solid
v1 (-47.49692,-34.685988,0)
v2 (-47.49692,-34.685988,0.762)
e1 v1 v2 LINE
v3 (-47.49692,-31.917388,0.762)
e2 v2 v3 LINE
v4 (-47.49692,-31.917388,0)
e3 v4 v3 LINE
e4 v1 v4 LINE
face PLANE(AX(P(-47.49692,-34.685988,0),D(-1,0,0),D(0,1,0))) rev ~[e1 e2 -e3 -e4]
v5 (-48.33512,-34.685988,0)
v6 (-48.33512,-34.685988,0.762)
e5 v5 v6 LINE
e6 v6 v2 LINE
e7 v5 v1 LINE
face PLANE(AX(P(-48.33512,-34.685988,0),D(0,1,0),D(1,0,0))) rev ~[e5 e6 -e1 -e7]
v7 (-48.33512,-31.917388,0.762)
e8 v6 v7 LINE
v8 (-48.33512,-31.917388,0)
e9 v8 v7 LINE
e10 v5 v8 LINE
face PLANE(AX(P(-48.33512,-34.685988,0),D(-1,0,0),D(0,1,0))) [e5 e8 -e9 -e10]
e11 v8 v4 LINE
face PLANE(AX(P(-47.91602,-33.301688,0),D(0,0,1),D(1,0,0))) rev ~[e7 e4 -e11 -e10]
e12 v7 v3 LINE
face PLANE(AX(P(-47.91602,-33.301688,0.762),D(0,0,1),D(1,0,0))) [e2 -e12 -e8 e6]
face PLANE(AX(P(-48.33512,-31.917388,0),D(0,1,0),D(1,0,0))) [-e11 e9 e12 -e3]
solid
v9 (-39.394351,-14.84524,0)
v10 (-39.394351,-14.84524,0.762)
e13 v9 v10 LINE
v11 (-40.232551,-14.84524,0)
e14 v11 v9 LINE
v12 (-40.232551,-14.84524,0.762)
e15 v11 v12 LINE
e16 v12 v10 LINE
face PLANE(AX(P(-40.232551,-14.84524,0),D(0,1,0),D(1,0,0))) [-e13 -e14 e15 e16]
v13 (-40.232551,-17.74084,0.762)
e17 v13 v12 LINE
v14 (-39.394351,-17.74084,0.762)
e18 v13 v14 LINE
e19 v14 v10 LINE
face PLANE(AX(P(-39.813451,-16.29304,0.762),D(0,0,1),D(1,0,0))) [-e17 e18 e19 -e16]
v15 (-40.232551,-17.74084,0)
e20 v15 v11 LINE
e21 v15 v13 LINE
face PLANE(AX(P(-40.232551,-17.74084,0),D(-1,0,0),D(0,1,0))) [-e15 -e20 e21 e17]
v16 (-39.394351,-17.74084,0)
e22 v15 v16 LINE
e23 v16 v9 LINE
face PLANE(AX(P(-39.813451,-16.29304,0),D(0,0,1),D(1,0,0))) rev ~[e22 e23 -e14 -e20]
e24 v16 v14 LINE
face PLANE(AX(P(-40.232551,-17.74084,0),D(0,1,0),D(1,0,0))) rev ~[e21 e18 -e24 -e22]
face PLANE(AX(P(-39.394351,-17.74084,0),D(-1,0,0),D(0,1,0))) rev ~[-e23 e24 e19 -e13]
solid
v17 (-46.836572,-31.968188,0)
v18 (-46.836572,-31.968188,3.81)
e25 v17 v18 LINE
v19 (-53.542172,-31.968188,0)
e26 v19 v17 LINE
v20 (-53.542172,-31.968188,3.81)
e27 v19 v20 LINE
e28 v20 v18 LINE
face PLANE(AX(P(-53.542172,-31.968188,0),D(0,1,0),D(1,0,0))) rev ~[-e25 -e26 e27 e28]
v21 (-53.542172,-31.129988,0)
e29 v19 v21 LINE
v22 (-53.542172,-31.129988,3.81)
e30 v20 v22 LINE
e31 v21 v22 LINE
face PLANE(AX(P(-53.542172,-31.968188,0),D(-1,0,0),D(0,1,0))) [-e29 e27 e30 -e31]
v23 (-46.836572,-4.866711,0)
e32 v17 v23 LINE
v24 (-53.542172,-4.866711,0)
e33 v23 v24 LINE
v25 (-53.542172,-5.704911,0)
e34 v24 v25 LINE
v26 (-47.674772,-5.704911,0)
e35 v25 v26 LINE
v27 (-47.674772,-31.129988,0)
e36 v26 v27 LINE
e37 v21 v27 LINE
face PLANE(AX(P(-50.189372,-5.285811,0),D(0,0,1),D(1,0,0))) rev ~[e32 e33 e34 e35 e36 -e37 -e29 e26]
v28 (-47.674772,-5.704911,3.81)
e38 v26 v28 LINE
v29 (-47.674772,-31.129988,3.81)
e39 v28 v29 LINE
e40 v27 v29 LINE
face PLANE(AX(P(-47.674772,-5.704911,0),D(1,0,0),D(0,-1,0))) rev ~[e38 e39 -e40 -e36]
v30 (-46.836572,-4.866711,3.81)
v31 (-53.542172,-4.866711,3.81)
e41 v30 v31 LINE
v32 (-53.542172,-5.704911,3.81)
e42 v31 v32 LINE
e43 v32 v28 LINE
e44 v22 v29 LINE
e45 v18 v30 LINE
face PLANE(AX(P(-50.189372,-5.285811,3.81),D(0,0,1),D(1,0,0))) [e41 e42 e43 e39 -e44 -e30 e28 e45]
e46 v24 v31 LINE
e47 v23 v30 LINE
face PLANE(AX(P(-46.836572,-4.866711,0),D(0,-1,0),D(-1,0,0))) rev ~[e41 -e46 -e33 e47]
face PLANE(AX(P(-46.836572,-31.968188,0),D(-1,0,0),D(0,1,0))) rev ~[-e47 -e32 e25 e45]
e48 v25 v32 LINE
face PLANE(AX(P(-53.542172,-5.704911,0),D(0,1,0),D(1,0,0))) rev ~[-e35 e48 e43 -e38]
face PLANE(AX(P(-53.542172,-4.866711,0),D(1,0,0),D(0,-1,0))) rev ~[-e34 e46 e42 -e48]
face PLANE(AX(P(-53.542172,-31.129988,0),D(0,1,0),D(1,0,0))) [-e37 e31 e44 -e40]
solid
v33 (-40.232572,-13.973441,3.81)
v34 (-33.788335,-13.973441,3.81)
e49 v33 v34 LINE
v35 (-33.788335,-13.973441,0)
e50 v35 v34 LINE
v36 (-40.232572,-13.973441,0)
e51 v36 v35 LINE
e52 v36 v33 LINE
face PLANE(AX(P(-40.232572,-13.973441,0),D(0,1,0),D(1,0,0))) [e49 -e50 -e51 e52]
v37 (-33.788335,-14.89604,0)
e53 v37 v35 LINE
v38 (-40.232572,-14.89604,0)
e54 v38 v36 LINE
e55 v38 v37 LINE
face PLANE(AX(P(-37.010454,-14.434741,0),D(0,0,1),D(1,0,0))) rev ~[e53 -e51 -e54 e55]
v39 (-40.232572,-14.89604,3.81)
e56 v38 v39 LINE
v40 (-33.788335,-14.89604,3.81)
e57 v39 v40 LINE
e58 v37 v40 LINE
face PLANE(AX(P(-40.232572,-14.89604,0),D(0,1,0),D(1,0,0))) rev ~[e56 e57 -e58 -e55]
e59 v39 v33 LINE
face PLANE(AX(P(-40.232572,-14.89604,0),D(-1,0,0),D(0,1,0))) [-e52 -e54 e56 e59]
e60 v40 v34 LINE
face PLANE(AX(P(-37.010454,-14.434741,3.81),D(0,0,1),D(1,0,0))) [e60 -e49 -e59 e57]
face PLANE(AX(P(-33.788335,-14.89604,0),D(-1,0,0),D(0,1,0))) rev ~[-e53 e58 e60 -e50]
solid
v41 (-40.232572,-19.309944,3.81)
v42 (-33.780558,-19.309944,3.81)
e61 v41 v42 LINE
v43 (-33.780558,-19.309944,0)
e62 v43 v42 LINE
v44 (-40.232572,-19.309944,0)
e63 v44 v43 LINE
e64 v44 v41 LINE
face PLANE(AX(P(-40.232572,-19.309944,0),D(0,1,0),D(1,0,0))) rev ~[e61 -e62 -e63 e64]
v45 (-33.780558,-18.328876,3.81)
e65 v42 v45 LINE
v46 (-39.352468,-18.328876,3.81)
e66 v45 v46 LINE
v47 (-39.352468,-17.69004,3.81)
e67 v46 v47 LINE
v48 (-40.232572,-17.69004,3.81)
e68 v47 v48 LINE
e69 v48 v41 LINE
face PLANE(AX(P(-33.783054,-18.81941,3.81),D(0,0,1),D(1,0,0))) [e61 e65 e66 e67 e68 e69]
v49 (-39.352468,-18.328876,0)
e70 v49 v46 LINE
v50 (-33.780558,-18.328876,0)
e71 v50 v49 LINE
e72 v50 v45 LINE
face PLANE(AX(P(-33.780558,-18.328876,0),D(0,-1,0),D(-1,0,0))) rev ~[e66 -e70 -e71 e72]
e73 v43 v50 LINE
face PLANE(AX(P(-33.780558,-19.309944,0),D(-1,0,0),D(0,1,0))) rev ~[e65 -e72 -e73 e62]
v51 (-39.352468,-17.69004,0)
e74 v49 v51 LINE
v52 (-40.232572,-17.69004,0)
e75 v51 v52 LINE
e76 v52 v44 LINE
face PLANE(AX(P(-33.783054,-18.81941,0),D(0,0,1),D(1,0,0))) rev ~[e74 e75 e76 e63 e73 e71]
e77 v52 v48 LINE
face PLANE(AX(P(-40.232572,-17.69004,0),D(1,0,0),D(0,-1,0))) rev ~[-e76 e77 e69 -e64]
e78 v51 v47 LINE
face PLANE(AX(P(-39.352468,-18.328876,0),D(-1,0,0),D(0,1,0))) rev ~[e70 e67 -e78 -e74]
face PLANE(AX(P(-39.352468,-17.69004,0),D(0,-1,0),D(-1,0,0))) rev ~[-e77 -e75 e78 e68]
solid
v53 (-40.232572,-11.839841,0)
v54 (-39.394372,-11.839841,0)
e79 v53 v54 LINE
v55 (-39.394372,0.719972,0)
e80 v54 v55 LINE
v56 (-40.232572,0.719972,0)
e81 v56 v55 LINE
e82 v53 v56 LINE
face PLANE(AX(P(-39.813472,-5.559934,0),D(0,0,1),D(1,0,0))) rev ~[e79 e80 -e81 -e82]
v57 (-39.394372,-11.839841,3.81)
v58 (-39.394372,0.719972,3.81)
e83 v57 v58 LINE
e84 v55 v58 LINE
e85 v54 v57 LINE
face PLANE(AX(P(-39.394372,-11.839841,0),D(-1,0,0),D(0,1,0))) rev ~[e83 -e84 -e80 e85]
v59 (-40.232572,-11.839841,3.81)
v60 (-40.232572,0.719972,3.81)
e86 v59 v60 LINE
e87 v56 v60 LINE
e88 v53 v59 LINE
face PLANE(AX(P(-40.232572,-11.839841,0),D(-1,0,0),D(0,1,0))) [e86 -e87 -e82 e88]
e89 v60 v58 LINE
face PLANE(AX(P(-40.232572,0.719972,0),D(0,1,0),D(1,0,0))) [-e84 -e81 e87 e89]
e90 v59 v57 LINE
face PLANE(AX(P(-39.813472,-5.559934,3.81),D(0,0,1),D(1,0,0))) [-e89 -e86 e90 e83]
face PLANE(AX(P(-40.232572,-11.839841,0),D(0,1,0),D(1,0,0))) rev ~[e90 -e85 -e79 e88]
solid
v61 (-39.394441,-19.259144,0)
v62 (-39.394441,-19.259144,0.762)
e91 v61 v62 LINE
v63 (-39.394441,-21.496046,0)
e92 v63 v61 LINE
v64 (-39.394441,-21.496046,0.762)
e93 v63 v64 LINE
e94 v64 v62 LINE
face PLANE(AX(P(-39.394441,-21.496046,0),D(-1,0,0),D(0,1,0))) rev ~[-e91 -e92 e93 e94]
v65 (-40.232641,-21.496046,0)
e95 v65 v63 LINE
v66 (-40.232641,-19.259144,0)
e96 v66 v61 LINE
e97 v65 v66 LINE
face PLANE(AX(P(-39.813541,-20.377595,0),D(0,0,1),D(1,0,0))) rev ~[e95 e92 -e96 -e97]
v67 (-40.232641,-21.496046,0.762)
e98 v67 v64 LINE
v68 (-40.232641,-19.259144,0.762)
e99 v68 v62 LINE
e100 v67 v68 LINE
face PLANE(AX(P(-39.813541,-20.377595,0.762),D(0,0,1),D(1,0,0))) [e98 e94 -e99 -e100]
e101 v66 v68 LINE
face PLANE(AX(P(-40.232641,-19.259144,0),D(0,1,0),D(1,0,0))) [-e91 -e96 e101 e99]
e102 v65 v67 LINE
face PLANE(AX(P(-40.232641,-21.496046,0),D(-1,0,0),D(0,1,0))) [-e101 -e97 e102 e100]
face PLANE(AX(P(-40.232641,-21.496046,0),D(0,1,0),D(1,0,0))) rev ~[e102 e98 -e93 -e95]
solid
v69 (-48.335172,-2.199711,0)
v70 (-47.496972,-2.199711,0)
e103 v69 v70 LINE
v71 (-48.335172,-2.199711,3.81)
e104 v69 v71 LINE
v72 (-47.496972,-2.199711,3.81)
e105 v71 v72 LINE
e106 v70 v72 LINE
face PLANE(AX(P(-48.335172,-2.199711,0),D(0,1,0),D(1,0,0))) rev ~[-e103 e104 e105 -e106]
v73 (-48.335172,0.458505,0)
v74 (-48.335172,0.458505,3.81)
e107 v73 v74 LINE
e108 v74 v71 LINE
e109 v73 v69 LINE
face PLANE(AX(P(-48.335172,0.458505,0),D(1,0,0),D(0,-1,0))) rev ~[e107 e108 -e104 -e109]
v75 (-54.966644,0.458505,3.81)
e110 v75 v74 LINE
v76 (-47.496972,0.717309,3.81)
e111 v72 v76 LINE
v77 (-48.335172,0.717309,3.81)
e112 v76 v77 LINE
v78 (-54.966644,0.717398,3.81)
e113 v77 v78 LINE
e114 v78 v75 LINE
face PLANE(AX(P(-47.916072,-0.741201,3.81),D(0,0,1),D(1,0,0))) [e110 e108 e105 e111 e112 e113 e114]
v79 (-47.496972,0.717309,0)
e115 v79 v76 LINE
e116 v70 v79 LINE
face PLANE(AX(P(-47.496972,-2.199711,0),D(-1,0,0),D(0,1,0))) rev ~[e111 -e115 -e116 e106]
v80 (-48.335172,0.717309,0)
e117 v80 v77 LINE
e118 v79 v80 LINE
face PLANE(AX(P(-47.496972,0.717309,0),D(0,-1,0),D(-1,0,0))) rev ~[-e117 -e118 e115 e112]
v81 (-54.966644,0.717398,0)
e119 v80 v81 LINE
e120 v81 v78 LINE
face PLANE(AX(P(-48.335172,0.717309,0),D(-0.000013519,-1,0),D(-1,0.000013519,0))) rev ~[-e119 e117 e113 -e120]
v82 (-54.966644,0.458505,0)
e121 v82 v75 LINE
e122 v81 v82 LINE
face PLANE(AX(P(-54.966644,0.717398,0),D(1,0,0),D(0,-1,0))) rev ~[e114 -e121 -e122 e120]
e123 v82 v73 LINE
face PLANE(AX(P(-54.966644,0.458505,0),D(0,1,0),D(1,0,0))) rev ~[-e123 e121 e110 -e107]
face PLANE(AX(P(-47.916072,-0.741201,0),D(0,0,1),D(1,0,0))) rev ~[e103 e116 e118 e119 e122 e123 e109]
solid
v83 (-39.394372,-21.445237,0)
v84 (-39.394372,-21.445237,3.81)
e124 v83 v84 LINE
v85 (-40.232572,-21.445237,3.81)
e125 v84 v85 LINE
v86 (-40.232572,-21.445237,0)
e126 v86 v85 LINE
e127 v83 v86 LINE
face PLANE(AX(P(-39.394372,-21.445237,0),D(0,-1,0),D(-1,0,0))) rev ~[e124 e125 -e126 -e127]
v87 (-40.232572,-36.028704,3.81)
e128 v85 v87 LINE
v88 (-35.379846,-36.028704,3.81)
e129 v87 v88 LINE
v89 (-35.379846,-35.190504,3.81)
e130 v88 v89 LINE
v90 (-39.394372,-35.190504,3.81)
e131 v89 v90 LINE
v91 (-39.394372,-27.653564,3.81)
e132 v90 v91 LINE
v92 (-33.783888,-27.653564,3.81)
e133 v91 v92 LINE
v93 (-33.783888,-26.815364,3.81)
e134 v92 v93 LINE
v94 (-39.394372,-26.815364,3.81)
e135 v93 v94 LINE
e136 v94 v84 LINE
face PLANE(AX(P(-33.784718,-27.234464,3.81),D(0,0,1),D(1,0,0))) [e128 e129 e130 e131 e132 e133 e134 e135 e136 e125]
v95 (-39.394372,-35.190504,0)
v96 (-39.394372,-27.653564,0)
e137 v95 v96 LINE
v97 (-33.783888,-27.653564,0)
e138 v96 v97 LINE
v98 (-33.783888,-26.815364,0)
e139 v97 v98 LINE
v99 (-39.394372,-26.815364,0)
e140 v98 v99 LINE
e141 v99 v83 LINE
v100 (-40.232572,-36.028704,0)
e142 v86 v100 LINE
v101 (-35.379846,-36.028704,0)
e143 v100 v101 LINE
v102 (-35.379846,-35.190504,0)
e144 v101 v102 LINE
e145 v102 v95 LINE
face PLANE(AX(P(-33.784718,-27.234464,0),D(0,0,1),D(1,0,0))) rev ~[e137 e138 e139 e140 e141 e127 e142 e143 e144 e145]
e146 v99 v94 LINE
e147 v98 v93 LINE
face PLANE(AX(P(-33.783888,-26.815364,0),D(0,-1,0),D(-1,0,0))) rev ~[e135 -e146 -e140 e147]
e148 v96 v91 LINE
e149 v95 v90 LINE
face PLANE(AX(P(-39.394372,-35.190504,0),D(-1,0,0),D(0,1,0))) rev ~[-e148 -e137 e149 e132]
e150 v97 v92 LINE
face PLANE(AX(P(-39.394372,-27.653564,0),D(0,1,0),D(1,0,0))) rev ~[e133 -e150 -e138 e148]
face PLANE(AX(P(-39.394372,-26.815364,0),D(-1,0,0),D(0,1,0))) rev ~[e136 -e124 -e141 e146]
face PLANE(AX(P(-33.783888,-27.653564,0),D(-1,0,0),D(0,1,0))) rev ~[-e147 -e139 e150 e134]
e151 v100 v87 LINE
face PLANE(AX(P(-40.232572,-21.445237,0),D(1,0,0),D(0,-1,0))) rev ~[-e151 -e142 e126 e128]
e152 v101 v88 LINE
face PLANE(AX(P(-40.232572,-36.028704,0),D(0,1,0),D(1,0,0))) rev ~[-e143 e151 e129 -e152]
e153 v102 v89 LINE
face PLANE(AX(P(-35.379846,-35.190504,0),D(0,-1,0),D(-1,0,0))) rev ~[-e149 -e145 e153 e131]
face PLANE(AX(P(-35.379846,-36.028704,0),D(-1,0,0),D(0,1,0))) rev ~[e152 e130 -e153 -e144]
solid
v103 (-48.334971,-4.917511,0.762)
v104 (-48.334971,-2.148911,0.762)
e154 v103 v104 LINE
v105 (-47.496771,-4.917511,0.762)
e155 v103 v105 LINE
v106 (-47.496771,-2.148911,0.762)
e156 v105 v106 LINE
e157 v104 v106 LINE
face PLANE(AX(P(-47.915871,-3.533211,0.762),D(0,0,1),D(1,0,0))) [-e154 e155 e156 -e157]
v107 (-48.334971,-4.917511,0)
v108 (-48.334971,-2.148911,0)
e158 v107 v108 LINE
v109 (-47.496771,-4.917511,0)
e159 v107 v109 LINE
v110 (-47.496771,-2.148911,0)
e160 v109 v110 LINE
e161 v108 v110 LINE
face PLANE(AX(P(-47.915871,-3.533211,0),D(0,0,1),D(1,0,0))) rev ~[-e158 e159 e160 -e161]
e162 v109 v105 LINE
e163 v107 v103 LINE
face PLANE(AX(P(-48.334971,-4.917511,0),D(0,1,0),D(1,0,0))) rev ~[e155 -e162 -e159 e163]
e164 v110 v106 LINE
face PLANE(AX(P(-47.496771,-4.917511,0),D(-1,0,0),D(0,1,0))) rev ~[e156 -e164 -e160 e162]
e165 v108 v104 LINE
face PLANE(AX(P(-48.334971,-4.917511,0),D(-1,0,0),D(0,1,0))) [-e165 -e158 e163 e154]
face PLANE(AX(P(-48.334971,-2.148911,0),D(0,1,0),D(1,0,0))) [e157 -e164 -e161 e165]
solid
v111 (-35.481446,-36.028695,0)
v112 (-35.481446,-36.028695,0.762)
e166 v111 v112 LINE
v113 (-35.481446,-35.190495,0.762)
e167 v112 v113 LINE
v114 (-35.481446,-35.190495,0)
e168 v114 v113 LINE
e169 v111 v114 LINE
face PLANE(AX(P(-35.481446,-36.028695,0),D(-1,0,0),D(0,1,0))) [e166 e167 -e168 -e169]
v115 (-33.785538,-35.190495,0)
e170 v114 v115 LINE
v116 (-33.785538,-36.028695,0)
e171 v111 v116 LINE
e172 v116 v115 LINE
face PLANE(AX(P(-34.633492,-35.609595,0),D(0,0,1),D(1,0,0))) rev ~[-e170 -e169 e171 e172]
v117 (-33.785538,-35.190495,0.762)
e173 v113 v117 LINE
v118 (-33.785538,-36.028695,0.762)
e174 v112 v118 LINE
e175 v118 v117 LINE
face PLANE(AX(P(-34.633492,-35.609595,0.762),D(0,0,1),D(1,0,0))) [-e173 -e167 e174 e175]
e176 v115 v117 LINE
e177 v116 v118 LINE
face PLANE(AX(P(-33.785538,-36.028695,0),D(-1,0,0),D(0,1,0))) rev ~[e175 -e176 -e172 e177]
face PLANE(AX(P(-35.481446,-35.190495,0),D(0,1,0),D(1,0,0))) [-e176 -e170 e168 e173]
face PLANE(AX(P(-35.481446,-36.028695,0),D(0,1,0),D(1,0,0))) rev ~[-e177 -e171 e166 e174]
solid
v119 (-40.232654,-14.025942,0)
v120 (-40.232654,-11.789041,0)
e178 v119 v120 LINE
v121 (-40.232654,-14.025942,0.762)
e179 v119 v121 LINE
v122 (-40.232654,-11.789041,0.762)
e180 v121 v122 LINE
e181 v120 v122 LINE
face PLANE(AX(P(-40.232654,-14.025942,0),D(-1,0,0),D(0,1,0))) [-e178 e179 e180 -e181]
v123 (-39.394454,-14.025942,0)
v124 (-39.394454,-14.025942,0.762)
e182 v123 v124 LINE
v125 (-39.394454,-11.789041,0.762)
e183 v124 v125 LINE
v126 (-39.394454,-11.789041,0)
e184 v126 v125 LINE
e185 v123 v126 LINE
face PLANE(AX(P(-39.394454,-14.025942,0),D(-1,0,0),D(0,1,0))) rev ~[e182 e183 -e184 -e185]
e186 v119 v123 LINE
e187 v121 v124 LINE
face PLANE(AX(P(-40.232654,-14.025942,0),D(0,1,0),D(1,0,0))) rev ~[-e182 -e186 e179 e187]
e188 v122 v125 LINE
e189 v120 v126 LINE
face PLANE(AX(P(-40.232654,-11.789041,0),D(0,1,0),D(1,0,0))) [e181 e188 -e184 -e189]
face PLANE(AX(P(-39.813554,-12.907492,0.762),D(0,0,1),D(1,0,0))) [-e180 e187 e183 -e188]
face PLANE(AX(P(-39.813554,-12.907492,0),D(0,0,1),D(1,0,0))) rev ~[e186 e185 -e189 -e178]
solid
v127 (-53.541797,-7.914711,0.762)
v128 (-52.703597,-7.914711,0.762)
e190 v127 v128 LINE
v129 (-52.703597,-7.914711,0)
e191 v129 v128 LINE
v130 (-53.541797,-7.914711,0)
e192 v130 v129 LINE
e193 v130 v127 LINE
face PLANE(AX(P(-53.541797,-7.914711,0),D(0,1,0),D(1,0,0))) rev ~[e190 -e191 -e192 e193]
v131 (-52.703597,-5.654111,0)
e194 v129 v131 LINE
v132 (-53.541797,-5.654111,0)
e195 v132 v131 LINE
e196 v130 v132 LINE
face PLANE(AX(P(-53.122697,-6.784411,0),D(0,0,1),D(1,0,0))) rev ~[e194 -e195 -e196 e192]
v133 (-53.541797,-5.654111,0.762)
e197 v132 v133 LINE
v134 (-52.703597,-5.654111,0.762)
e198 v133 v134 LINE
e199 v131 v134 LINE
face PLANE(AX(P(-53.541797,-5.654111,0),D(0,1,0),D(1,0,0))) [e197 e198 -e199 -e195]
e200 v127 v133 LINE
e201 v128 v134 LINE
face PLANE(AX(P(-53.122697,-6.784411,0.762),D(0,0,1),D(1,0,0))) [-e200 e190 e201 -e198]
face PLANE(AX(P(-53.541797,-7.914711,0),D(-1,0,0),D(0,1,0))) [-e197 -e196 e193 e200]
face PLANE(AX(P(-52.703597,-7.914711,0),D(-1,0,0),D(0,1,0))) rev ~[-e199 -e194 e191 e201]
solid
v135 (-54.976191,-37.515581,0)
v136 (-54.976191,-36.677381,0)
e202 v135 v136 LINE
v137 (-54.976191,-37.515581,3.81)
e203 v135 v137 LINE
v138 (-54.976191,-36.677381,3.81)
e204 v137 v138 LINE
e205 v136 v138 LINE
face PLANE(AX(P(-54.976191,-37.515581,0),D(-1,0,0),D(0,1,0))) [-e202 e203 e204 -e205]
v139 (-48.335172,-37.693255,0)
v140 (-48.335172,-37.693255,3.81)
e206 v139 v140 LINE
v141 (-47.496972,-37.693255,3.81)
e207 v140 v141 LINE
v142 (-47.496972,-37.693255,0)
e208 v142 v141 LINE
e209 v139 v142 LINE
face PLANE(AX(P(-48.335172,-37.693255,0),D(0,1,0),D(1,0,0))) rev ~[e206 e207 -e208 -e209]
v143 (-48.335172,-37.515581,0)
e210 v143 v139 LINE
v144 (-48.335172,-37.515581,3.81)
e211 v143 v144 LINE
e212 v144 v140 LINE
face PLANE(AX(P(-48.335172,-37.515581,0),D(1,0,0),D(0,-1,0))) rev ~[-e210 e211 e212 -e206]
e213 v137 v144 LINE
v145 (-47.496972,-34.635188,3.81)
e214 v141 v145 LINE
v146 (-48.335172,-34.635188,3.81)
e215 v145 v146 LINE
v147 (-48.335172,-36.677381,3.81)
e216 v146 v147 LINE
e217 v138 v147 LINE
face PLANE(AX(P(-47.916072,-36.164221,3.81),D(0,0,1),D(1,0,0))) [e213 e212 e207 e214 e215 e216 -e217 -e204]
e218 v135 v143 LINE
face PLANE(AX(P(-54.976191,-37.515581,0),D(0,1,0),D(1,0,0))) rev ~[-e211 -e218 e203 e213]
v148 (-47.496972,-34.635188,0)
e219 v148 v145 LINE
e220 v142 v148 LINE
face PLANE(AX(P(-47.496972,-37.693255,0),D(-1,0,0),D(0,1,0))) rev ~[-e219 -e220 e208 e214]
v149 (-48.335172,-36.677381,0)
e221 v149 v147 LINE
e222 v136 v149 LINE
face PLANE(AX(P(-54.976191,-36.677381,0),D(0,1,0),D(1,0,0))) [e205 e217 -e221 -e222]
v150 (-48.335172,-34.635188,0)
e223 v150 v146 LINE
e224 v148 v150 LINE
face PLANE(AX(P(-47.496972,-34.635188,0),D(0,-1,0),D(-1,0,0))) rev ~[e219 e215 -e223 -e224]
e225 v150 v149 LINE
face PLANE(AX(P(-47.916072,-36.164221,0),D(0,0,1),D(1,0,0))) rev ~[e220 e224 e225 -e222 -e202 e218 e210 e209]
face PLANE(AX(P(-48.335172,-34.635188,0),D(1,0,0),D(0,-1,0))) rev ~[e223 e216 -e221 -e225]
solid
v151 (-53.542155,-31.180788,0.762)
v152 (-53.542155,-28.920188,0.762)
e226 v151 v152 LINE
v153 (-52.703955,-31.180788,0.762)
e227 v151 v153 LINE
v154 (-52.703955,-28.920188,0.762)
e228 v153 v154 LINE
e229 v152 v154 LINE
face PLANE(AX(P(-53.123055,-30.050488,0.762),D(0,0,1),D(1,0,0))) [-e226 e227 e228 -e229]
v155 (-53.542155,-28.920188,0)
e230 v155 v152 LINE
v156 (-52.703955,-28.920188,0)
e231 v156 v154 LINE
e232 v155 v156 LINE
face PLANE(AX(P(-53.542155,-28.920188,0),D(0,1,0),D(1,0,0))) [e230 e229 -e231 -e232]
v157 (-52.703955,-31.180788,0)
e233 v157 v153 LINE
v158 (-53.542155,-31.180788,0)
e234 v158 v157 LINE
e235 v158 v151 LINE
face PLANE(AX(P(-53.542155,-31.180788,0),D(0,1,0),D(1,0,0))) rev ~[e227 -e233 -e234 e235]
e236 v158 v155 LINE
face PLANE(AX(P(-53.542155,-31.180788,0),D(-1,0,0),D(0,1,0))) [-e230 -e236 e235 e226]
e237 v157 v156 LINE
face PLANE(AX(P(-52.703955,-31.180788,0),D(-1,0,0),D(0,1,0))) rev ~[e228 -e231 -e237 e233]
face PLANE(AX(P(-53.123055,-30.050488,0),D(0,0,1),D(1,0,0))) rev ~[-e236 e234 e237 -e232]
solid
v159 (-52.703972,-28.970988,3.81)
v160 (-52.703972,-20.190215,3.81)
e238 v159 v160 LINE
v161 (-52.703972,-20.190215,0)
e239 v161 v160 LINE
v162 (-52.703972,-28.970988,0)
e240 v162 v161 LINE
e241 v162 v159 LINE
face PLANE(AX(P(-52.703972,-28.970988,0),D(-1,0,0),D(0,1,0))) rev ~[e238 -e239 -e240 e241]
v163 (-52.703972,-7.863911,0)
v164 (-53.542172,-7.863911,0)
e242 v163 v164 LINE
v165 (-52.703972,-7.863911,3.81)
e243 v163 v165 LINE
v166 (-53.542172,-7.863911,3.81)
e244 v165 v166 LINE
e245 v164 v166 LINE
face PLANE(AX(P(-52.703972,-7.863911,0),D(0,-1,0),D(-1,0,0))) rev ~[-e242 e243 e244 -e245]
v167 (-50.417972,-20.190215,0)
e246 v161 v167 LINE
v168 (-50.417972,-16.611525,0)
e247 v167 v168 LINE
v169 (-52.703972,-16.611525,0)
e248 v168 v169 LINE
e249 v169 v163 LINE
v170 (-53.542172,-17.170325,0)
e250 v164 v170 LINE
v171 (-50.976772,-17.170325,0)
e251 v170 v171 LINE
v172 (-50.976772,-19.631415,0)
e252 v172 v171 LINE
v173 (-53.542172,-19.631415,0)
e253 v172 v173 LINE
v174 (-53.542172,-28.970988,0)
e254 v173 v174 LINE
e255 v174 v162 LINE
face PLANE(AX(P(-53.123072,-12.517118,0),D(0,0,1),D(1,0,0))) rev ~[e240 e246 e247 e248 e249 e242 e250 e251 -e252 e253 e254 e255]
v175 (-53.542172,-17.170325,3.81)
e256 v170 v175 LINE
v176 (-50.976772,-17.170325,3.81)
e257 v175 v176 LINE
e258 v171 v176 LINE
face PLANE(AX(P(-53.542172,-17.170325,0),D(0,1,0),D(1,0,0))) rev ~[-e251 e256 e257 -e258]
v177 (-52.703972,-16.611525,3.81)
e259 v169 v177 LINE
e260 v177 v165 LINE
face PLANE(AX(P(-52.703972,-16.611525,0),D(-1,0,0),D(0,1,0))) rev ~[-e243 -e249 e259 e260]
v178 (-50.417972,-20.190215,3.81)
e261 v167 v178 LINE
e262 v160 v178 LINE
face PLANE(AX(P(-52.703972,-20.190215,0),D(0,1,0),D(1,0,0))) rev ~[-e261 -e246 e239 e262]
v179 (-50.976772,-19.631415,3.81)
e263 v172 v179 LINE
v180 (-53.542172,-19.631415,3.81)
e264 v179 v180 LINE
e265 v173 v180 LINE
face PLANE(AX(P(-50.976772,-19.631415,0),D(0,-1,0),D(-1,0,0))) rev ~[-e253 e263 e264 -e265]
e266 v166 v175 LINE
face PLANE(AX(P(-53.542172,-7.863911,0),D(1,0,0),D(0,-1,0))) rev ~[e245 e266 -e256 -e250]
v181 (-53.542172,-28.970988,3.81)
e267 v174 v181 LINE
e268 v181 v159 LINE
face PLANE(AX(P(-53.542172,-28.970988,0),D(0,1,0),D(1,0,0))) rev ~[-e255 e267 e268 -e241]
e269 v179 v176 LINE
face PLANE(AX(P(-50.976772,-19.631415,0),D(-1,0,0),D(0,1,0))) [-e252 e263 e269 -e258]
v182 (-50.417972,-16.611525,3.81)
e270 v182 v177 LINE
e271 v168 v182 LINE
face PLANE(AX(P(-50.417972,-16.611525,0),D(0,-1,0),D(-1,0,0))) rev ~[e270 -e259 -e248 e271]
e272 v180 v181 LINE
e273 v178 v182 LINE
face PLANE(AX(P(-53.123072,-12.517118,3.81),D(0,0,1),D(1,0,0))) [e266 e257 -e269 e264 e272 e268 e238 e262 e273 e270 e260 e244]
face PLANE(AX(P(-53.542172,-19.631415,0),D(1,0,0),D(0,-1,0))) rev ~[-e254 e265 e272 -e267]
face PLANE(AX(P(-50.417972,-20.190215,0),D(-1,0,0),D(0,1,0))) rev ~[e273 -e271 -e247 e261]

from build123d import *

# Parameters (mm, degrees)
F1_DEPTH = 3.81
F0_W     = 0.0016617535
F0_H     = 0.8382
F0_W_2   = 5.6088228764
F0_W_3   = 0.0049910592
F0_H_2   = 0.9810682386
F0_W_4   = 5.5669181896
F0_W_5   = 0.8382
F0_H_3   = 12.5598123049
F0_W_6   = 6.4442373921
F0_H_4   = 0.9225998074
F0_W_7   = 5.8674
F0_W_8   = 0.5588
F0_H_5   = 2.4610901317
F0_W_9   = 6.6410191357
F2_W     = 0.8382
F2_H     = 2.2369018
F3_DEPTH = 0.762
F2_H_2   = 2.8956
F2_H_3   = 2.2606
F2_W_2   = 1.6959072
F2_H_4   = 0.8382
F2_H_5   = 2.7686


# Not quite as in the source:
# - ends of sketch curves that miss each other by under 0.0002 mm in the source are joined


with BuildPart() as f1:
    # F0 (on Top) → F1 (new body)
    with BuildSketch(Plane.XY):
        Polygon((-47.496972236, -2.1997114257), (-47.496972236, 0.7173087654), (-48.335172236, 0.7173087654), (-48.335172236, 0.4585053894), (-48.335172236, -2.1997114257), align=None)
        Polygon((-48.335172236, 0.4585053894), (-48.335172236, 0.7173087654), (-54.9666435823, 0.7173984171), (-54.9666435823, 0.4585053894), align=None)
    extrude(amount=F1_DEPTH)


with BuildPart() as f1b:
    # F0 (on Top) → F1, piece 2 (new body)
    with BuildSketch(Plane.XY):
        with Locations((-33.7847184829, -27.2344640045)):
            Rectangle(F0_W, F0_H)
        with Locations((-36.5899607978, -27.2344640045)):
            Rectangle(F0_W_2, F0_H)
        Polygon((-39.394372236, -27.6535640045), (-39.394372236, -26.8153640045), (-39.394372236, -21.4452373369), (-40.232572236, -21.4452373369), (-40.232572236, -35.1905039115), (-39.394372236, -35.1905039115), align=None)
        Polygon((-35.379845649, -35.1905039115), (-39.394372236, -35.1905039115), (-40.232572236, -35.1905039115), (-40.232572236, -36.0287039115), (-35.379845649, -36.0287039115), align=None)
    extrude(amount=F1_DEPTH)


with BuildPart() as f1c:
    # F0 (on Top) → F1, piece 3 (new body)
    with BuildSketch(Plane.XY):
        with Locations((-33.78305383, -18.8194096594)):
            Rectangle(F0_W_3, F0_H_2)
        with Locations((-36.5690084544, -18.8194096594)):
            Rectangle(F0_W_4, F0_H_2)
        Polygon((-39.3524675492, -19.3099437787), (-39.3524675492, -18.3288755401), (-39.3524675492, -17.690040408), (-40.232572236, -17.690040408), (-40.232572236, -19.3099437787), align=None)
    extrude(amount=F1_DEPTH)


with BuildPart() as f1d:
    # F0 (on Top) → F1, piece 4 (new body)
    with BuildSketch(Plane.XY):
        with Locations((-39.813472236, -5.5599344481)):
            Rectangle(F0_W_5, F0_H_3)
    extrude(amount=F1_DEPTH)


with BuildPart() as f1e:
    # F0 (on Top) → F1, piece 5 (new body)
    with BuildSketch(Plane.XY):
        with Locations((-37.0104535399, -14.4347405043)):
            Rectangle(F0_W_6, F0_H_4)
    extrude(amount=F1_DEPTH)


with BuildPart() as f1f:
    # F0 (on Top) → F1, piece 6 (new body)
    with BuildSketch(Plane.XY):
        Polygon((-46.836572236, -4.8667114257), (-53.542172236, -4.8667114257), (-53.542172236, -5.7049114257), (-47.674772236, -5.7049114257), (-46.836572236, -5.7049114257), align=None)
        Polygon((-46.836572236, -31.9681875408), (-46.836572236, -5.7049114257), (-47.674772236, -5.7049114257), (-47.674772236, -31.1299875408), (-47.674772236, -31.9681875408), align=None)
        with Locations((-50.608472236, -31.5490875408)):
            Rectangle(F0_W_7, F0_H)
    extrude(amount=F1_DEPTH)


with BuildPart() as f1g:
    # F0 (on Top) → F1, piece 7 (new body)
    with BuildSketch(Plane.XY):
        Polygon((-52.703972236, -7.8639114257), (-53.542172236, -7.8639114257), (-53.542172236, -17.1703245472), (-52.703972236, -17.1703245472), (-52.703972236, -16.6115245472), align=None)
        Polygon((-50.417972236, -16.6115245472), (-52.703972236, -16.6115245472), (-52.703972236, -17.1703245472), (-50.976772236, -17.1703245472), (-50.417972236, -17.1703245472), align=None)
        with Locations((-50.697372236, -18.4008696131)):
            Rectangle(F0_W_8, F0_H_5)
        Polygon((-50.417972236, -19.631414679), (-50.976772236, -19.631414679), (-52.703972236, -19.631414679), (-52.703972236, -20.190214679), (-50.417972236, -20.190214679), align=None)
        Polygon((-52.703972236, -20.190214679), (-52.703972236, -19.631414679), (-53.542172236, -19.631414679), (-53.542172236, -28.9709875408), (-52.703972236, -28.9709875408), align=None)
    extrude(amount=F1_DEPTH)


with BuildPart() as f1h:
    # F0 (on Top) → F1, piece 8 (new body)
    with BuildSketch(Plane.XY):
        Polygon((-47.496972236, -34.6351875408), (-48.335172236, -34.6351875408), (-48.335172236, -36.6773806541), (-48.335172236, -37.5155806541), (-48.335172236, -37.6932546496), (-47.496972236, -37.6932546496), align=None)
        with Locations((-51.6556818038, -37.0964806541)):
            Rectangle(F0_W_9, F0_H)
    extrude(amount=F1_DEPTH)


with BuildPart() as f3:
    # F2 (on Top) → F3 (new body)
    with BuildSketch(Plane.XY):
        with Locations((-39.8135535358, -12.9074915006)):
            Rectangle(F2_W, F2_H)
    extrude(amount=F3_DEPTH)


with BuildPart() as f3b:
    # F2 (on Top) → F3, piece 2 (new body)
    with BuildSketch(Plane.XY):
        with Locations((-39.813451476, -16.293040408)):
            Rectangle(F2_W, F2_H_2)
    extrude(amount=F3_DEPTH)


with BuildPart() as f3c:
    # F2 (on Top) → F3, piece 3 (new body)
    with BuildSketch(Plane.XY):
        with Locations((-53.1226970702, -6.7844114257)):
            Rectangle(F2_W, F2_H_3)
    extrude(amount=F3_DEPTH)


with BuildPart() as f3d:
    # F2 (on Top) → F3, piece 4 (new body)
    with BuildSketch(Plane.XY):
        with Locations((-53.1230546267, -30.0504875408)):
            Rectangle(F2_W, F2_H_3)
    extrude(amount=F3_DEPTH)


with BuildPart() as f3e:
    # F2 (on Top) → F3, piece 5 (new body)
    with BuildSketch(Plane.XY):
        with Locations((-34.633492049, -35.6095951541)):
            Rectangle(F2_W_2, F2_H_4)
    extrude(amount=F3_DEPTH)


with BuildPart() as f3f:
    # F2 (on Top) → F3, piece 6 (new body)
    with BuildSketch(Plane.XY):
        with Locations((-39.8135408784, -20.3775946787)):
            Rectangle(F2_W, F2_H)
    extrude(amount=F3_DEPTH)


with BuildPart() as f3g:
    # F2 (on Top) → F3, piece 7 (new body)
    with BuildSketch(Plane.XY):
        with Locations((-47.9158710703, -3.5332114257)):
            Rectangle(F2_W, F2_H_5)
    extrude(amount=F3_DEPTH)


with BuildPart() as f3h:
    # F2 (on Top) → F3, piece 8 (new body)
    with BuildSketch(Plane.XY):
        with Locations((-47.9160200819, -33.3016875408)):
            Rectangle(F2_W, F2_H_5)
    extrude(amount=F3_DEPTH)


solid = Compound([f1.part, f1b.part, f1c.part, f1d.part, f1e.part, f1f.part, f1g.part, f1h.part, f3.part, f3b.part, f3c.part, f3d.part, f3e.part, f3f.part, f3g.part, f3h.part])
